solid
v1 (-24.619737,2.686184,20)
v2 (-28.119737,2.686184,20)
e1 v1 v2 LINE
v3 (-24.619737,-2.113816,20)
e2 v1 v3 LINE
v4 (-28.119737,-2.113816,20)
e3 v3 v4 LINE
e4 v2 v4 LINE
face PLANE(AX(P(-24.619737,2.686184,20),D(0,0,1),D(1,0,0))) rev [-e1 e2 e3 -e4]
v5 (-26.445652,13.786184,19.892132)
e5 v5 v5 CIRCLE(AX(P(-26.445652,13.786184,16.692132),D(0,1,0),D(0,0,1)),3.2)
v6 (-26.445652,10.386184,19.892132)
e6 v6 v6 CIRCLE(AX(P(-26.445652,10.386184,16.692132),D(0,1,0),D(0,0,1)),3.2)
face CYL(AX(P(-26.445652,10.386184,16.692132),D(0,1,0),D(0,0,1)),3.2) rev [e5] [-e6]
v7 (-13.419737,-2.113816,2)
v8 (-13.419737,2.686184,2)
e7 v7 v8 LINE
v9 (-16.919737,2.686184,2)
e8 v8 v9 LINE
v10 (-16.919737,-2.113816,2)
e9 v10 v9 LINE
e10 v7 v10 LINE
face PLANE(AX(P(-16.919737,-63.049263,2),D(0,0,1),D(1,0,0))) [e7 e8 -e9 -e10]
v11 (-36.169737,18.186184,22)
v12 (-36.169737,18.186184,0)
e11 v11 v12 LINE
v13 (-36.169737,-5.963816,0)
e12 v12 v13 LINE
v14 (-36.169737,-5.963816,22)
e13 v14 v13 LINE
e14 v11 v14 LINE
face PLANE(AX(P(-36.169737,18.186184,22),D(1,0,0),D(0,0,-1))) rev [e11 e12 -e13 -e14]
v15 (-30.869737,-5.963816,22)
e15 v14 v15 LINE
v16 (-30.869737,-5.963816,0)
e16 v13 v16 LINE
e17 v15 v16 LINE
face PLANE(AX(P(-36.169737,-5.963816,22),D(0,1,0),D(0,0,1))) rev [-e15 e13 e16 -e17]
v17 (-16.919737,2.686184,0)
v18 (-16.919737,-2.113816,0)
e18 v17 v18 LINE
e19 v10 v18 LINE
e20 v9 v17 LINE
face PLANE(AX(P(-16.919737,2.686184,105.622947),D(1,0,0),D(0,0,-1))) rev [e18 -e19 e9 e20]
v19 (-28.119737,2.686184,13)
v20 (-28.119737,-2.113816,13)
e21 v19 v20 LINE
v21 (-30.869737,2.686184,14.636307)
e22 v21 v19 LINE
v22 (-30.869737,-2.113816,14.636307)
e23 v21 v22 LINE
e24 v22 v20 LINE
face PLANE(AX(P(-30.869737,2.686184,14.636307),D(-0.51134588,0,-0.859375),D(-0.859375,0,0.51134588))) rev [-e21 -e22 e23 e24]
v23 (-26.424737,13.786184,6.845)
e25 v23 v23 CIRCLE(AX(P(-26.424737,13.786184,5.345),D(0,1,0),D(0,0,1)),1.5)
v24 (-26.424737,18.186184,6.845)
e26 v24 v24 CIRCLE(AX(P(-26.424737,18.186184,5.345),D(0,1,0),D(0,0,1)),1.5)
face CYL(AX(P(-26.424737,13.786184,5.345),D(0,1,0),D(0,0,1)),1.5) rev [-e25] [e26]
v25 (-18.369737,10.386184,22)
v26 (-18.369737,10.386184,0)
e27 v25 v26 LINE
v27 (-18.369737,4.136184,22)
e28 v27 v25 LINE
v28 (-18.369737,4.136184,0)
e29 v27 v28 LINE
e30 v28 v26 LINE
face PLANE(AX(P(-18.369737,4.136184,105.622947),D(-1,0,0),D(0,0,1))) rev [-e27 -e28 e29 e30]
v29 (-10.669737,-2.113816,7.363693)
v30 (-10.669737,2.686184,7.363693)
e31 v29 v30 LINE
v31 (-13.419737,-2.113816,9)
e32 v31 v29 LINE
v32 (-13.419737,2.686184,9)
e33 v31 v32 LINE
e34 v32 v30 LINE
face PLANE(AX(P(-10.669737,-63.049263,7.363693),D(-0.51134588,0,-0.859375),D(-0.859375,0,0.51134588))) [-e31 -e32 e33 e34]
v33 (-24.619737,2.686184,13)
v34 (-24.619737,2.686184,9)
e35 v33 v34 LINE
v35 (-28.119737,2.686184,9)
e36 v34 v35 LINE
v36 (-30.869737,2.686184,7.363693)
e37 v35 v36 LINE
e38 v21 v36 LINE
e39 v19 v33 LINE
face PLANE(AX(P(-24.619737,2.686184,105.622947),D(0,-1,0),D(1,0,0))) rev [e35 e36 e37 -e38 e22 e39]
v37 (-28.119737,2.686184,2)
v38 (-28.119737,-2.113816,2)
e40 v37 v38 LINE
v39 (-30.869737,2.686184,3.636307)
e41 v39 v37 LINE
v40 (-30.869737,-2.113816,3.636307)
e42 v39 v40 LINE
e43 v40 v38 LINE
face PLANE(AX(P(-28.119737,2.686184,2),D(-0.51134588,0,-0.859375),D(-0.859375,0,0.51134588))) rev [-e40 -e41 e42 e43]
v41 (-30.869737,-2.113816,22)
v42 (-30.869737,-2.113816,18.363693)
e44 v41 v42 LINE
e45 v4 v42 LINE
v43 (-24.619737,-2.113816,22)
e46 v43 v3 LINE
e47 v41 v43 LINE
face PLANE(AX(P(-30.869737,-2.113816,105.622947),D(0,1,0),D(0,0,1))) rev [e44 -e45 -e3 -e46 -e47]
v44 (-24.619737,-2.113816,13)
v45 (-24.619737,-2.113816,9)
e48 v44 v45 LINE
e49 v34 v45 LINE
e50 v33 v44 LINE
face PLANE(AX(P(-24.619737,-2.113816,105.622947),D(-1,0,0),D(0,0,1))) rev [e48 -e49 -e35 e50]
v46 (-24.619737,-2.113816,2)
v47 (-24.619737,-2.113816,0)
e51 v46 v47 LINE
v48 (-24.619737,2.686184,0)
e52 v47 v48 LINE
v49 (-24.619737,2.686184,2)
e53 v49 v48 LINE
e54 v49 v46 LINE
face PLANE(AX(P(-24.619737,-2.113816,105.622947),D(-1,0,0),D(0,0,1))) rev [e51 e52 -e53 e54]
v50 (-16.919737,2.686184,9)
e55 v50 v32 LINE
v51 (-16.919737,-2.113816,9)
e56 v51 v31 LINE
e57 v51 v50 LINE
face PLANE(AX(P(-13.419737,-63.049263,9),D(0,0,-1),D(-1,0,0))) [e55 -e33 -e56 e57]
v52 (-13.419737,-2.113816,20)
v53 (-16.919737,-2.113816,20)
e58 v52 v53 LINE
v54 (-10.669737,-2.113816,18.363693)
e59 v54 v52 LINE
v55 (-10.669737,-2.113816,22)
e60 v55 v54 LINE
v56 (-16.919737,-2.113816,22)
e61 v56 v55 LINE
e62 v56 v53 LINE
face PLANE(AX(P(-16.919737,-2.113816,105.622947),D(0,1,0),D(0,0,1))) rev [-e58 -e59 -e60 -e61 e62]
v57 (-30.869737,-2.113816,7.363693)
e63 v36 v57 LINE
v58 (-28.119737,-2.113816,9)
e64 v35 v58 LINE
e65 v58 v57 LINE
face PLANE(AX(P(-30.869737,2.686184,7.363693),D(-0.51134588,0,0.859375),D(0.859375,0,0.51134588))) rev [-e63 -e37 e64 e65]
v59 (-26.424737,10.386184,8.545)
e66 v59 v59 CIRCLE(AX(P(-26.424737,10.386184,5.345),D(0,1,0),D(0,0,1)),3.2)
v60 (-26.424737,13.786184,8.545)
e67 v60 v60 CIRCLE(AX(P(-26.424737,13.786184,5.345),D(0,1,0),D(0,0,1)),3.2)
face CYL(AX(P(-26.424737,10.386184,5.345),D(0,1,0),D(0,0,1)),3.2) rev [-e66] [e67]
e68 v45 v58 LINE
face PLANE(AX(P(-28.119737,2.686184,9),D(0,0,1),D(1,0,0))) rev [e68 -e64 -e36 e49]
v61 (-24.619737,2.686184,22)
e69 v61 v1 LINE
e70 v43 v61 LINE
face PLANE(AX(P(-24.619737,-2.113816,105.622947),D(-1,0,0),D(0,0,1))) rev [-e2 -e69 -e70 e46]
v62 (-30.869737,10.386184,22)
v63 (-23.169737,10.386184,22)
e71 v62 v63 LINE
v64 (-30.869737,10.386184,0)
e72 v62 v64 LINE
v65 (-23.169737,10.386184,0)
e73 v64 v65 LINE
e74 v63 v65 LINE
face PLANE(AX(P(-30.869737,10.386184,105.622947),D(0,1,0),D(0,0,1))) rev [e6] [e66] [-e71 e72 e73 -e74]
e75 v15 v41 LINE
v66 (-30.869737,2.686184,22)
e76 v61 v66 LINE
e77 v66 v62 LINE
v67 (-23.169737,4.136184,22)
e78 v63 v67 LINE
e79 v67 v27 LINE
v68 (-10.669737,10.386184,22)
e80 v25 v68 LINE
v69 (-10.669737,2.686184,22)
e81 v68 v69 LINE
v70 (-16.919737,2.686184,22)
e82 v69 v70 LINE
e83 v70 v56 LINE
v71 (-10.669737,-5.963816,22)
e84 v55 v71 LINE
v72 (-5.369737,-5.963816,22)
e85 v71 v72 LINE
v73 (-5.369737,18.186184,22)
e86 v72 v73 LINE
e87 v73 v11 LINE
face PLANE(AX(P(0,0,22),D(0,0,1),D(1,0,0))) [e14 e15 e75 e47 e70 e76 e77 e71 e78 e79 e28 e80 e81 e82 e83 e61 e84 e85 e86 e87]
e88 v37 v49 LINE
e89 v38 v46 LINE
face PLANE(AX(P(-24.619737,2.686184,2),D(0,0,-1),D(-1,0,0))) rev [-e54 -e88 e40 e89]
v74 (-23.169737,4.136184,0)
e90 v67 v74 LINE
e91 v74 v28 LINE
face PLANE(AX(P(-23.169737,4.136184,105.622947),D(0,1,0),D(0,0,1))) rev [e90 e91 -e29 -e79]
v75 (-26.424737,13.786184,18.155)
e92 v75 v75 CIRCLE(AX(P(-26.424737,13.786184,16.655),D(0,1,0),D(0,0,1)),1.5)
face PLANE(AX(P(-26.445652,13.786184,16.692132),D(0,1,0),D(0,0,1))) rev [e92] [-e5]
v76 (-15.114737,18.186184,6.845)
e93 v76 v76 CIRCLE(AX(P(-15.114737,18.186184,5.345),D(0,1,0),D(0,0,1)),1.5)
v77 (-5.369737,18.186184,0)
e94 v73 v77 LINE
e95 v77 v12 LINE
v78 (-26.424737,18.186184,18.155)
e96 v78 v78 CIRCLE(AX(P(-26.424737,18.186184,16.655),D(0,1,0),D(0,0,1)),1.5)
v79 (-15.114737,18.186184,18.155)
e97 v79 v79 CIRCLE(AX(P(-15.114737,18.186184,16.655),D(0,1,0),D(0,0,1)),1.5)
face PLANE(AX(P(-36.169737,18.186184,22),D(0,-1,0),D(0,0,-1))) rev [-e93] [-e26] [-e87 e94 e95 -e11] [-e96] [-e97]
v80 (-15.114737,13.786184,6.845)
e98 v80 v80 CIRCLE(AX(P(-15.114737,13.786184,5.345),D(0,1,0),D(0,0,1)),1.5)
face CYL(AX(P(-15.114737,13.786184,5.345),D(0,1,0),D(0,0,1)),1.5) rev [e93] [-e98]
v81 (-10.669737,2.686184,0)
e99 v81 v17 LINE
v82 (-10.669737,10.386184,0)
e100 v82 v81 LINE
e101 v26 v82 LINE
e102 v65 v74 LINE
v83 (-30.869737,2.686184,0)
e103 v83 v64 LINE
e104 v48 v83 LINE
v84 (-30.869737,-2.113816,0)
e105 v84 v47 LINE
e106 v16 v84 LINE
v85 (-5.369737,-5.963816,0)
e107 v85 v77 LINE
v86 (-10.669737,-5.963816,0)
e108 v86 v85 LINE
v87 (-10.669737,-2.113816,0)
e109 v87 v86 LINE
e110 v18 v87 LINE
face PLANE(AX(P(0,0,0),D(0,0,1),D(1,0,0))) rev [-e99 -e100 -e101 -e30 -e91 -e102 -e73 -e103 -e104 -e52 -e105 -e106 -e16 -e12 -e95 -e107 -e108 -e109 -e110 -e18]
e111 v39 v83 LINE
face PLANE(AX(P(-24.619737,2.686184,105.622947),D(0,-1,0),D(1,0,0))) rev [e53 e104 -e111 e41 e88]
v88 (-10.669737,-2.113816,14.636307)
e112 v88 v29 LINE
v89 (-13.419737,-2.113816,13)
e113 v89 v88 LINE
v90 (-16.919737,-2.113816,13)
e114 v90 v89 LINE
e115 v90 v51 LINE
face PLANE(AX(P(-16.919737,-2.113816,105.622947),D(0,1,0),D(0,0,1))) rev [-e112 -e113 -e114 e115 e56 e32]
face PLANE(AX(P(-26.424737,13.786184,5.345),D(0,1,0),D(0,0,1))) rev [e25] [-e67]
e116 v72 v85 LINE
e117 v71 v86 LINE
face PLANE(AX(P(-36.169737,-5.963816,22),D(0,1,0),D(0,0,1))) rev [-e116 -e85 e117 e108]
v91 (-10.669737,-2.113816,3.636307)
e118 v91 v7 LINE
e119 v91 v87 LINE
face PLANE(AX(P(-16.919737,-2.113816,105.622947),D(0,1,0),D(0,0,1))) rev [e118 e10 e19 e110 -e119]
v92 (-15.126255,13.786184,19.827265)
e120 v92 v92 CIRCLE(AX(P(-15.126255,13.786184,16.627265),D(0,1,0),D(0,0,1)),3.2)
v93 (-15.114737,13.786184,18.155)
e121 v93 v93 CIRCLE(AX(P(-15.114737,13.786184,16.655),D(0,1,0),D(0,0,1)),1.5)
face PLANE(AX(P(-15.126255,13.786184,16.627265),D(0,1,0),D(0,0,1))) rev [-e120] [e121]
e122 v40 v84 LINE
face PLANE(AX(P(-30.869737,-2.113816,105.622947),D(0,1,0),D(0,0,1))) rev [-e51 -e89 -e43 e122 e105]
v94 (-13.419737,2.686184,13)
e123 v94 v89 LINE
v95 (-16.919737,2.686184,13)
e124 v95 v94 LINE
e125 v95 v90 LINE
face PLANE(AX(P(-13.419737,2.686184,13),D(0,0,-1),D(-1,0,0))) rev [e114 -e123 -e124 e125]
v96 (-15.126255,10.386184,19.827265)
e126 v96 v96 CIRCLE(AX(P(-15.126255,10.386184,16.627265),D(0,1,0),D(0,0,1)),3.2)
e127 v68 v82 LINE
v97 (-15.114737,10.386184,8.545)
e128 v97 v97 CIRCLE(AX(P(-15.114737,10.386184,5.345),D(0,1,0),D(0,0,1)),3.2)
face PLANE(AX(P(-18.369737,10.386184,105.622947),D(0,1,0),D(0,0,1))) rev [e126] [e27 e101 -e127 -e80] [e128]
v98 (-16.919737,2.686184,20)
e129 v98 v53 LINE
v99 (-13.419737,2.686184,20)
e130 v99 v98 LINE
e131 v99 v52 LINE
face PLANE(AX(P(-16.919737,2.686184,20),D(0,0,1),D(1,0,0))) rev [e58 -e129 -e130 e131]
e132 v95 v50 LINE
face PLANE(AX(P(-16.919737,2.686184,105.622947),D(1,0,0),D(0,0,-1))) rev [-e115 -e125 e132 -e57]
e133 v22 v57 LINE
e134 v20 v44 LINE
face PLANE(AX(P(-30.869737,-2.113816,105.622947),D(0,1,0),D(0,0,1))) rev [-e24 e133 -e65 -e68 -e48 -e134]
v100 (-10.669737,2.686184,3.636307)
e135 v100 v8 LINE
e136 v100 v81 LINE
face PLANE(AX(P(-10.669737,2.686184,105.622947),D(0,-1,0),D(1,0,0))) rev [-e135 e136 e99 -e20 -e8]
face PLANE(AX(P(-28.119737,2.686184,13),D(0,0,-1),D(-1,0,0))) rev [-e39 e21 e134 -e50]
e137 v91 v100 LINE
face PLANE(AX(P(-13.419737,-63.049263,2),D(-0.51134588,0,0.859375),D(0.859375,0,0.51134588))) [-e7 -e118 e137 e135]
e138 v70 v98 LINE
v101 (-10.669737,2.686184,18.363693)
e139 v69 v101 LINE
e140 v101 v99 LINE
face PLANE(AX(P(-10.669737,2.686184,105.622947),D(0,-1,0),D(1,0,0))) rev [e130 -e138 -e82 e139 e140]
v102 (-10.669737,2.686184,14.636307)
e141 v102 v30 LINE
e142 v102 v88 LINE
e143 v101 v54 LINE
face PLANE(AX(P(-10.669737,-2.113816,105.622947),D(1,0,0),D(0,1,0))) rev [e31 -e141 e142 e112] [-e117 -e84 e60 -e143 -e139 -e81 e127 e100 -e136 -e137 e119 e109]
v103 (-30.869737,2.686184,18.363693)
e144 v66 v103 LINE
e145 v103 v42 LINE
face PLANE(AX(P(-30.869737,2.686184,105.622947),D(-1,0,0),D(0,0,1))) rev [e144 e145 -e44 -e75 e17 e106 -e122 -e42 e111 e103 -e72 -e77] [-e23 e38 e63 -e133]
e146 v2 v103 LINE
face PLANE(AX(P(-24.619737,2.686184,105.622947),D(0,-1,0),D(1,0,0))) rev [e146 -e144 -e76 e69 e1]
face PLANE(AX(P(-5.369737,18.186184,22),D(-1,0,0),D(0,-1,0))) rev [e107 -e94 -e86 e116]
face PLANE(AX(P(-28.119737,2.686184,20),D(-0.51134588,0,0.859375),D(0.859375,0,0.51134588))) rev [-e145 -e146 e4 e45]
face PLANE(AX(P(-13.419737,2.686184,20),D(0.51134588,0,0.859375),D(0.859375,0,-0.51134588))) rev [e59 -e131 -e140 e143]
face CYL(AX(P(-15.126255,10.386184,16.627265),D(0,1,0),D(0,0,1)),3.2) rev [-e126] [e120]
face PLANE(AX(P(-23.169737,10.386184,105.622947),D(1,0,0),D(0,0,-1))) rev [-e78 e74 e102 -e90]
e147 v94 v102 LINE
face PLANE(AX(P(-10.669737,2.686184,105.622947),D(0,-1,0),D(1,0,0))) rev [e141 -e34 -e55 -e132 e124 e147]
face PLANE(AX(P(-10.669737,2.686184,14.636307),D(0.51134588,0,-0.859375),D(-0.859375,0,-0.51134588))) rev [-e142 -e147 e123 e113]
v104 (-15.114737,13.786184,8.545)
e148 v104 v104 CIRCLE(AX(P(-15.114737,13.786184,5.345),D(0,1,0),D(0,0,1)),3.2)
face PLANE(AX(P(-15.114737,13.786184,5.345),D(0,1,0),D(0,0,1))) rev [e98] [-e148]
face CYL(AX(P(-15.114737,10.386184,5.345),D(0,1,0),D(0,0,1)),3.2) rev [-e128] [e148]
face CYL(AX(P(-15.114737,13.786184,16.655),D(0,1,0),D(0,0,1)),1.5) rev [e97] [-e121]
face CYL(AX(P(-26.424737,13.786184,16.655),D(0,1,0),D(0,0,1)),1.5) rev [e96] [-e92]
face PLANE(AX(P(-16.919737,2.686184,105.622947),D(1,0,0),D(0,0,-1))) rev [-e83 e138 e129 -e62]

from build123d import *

# Parameters (mm, degrees)
ESQUISSE1_W                   = 30.8
ESQUISSE1_H                   = 24.15
BOSS_EXTRU_1_DEPTH            = 22
ENL_V_START                   = -22
ENL_V_MAT_EXTRU_2_DEPTH       = 22
ESQUISSE3_R                   = 1.5
ENL_V_MAT_EXTRU_3_DEPTH       = 4.4
ESQUISSE6_R                   = 3.2
ENL_V_MAT_EXTRU_6_DEPTH       = 3.4
ESQUISSE7_R                   = 3.2
ENL_V_MAT_EXTRU_7_DEPTH       = 3.4
ESQUISSE10_R                  = 3.2
ENL_V_MAT_EXTRU_10_DEPTH      = 3.4
ESQUISSE11_R                  = 3.2
ENL_V_MAT_EXTRU_11_DEPTH      = 3.4
ENL_V_MAT_EXTRU_14_DEPTH      = 47.950397903
ENL_V_MAT_EXTRU_14_DEPTH_BACK = 4.8
ENL_V_MAT_EXTRU_19_DEPTH      = 4.8
ENL_V_MAT_EXTRU_20_DEPTH      = 4.8
ENL_V_MAT_EXTRU_21_DEPTH      = 4.8


# Read off the part's stored shape, not the designer's step: Enlèv. mat.-Extru.2
with BuildPart() as part:
    # Esquisse1 → Boss.-Extru.1 (new body)
    with BuildSketch(Plane.XY):
        with Locations((-20.769736842, 6.111184211)):
            Rectangle(ESQUISSE1_W, ESQUISSE1_H)
    extrude(amount=BOSS_EXTRU_1_DEPTH)

    # Enlèv. mat.-Extru.2 outline → Enlèv. mat.-Extru.2 (cut)
    with BuildSketch(Plane.XY.offset(22).offset(ENL_V_START)):
        Polygon((-30.869736842, -5.963815789), (-10.669736842, -5.963815789), (-10.669736842, -2.113815789), (-16.919736842, -2.113815789), (-16.919736842, 2.686184211), (-10.669736842, 2.686184211), (-10.669736842, 10.386184211), (-18.369736842, 10.386184211), (-18.369736842, 4.136184211), (-23.169736842, 4.136184211), (-23.169736842, 10.386184211), (-30.869736842, 10.386184211), (-30.869736842, 2.686184211), (-24.619736842, 2.686184211), (-24.619736842, -2.113815789), (-30.869736842, -2.113815789), align=None)
    extrude(amount=ENL_V_MAT_EXTRU_2_DEPTH, mode=Mode.SUBTRACT)

    # Esquisse3 → Enlèv. mat.-Extru.3 (cut)
    with BuildSketch(Plane(origin=(0, 18.186184211, 0), x_dir=(1, 0, 0), z_dir=(0, 1, 0))):
        with Locations(Location((-26.424736842, -5.345, 0), (0, 0, 270))):
            Circle(ESQUISSE3_R)
        with Locations(Location((-15.114736842, -5.345, 0), (0, 0, 270))):
            Circle(ESQUISSE3_R)
        with Locations(Location((-26.424736842, -16.655, 0), (0, 0, 270))):
            Circle(ESQUISSE3_R)
        with Locations(Location((-15.114736842, -16.655, 0), (0, 0, 270))):
            Circle(ESQUISSE3_R)
    extrude(amount=-ENL_V_MAT_EXTRU_3_DEPTH, mode=Mode.SUBTRACT)

    # Esquisse6 → Enlèv. mat.-Extru.6 (cut)
    with BuildSketch(Plane(origin=(0, 13.786184211, 0), x_dir=(1, 0, 0), z_dir=(0, 1, 0))):
        with Locations(Location((-15.126255276, -16.627264665, 0), (0, 0, 270))):
            Circle(ESQUISSE6_R)
    extrude(amount=-ENL_V_MAT_EXTRU_6_DEPTH, mode=Mode.SUBTRACT)

    # Esquisse7 → Enlèv. mat.-Extru.7 (cut)
    with BuildSketch(Plane(origin=(0, 13.786184211, 0), x_dir=(1, 0, 0), z_dir=(0, 1, 0))):
        with Locations(Location((-26.44565221, -16.692132269, 0), (0, 0, 270))):
            Circle(ESQUISSE7_R)
    extrude(amount=-ENL_V_MAT_EXTRU_7_DEPTH, mode=Mode.SUBTRACT)

    # Esquisse10 → Enlèv. mat.-Extru.10 (cut)
    with BuildSketch(Plane(origin=(0, 13.786184211, 0), x_dir=(1, 0, 0), z_dir=(0, 1, 0))):
        with Locations(Location((-15.114736842, -5.345, 0), (0, 0, 270))):
            Circle(ESQUISSE10_R)
    extrude(amount=-ENL_V_MAT_EXTRU_10_DEPTH, mode=Mode.SUBTRACT)

    # Esquisse11 → Enlèv. mat.-Extru.11 (cut)
    with BuildSketch(Plane(origin=(0, 13.786184211, 0), x_dir=(1, 0, 0), z_dir=(0, 1, 0))):
        with Locations(Location((-26.424736842, -5.345, 0), (0, 0, 270))):
            Circle(ESQUISSE11_R)
    extrude(amount=-ENL_V_MAT_EXTRU_11_DEPTH, mode=Mode.SUBTRACT)

    # Esquisse12 → Enlèv. mat.-Extru.14 (cut, two sides: drawn at the far end of the back side and taken through both)
    with BuildSketch(Plane(origin=(0, -2.113815789, 0), x_dir=(-1, 0, 0), z_dir=(0, -1, 0)).offset(-ENL_V_MAT_EXTRU_14_DEPTH_BACK)):
        Polygon((16.919736842, -9), (16.919736842, -2), (13.419736842, -2), (10.669736842, -3.636306817), (10.669736842, -7.363693183), (13.419736842, -9), align=None)
    extrude(amount=ENL_V_MAT_EXTRU_14_DEPTH + ENL_V_MAT_EXTRU_14_DEPTH_BACK, mode=Mode.SUBTRACT)

    # Esquisse13 → Enlèv. mat.-Extru.19 (cut)
    with BuildSketch(Plane(origin=(0, -2.113815789, 0), x_dir=(-1, 0, 0), z_dir=(0, -1, 0))):
        Polygon((24.619736842, -2), (28.119736842, -2), (30.869736842, -3.636306817), (30.869736842, -7.363693183), (28.119736842, -9), (24.619736842, -9), align=None)
    extrude(amount=-ENL_V_MAT_EXTRU_19_DEPTH, mode=Mode.SUBTRACT)

    # Esquisse14 → Enlèv. mat.-Extru.20 (cut)
    with BuildSketch(Plane(origin=(0, -2.113815789, 0), x_dir=(-1, 0, 0), z_dir=(0, -1, 0))):
        Polygon((24.619736842, -20), (28.119736842, -20), (30.869736842, -18.363693183), (30.869736842, -14.636306817), (28.119736842, -13), (24.619736842, -13), align=None)
    extrude(amount=-ENL_V_MAT_EXTRU_20_DEPTH, mode=Mode.SUBTRACT)

    # Esquisse16 → Enlèv. mat.-Extru.21 (cut)
    with BuildSketch(Plane(origin=(0, -2.113815789, 0), x_dir=(-1, 0, 0), z_dir=(0, -1, 0))):
        Polygon((16.919736842, -20), (13.419736842, -20), (10.669736842, -18.363693183), (10.669736842, -14.636306817), (13.419736842, -13), (16.919736842, -13), align=None)
    extrude(amount=-ENL_V_MAT_EXTRU_21_DEPTH, mode=Mode.SUBTRACT)


solid = part.part
